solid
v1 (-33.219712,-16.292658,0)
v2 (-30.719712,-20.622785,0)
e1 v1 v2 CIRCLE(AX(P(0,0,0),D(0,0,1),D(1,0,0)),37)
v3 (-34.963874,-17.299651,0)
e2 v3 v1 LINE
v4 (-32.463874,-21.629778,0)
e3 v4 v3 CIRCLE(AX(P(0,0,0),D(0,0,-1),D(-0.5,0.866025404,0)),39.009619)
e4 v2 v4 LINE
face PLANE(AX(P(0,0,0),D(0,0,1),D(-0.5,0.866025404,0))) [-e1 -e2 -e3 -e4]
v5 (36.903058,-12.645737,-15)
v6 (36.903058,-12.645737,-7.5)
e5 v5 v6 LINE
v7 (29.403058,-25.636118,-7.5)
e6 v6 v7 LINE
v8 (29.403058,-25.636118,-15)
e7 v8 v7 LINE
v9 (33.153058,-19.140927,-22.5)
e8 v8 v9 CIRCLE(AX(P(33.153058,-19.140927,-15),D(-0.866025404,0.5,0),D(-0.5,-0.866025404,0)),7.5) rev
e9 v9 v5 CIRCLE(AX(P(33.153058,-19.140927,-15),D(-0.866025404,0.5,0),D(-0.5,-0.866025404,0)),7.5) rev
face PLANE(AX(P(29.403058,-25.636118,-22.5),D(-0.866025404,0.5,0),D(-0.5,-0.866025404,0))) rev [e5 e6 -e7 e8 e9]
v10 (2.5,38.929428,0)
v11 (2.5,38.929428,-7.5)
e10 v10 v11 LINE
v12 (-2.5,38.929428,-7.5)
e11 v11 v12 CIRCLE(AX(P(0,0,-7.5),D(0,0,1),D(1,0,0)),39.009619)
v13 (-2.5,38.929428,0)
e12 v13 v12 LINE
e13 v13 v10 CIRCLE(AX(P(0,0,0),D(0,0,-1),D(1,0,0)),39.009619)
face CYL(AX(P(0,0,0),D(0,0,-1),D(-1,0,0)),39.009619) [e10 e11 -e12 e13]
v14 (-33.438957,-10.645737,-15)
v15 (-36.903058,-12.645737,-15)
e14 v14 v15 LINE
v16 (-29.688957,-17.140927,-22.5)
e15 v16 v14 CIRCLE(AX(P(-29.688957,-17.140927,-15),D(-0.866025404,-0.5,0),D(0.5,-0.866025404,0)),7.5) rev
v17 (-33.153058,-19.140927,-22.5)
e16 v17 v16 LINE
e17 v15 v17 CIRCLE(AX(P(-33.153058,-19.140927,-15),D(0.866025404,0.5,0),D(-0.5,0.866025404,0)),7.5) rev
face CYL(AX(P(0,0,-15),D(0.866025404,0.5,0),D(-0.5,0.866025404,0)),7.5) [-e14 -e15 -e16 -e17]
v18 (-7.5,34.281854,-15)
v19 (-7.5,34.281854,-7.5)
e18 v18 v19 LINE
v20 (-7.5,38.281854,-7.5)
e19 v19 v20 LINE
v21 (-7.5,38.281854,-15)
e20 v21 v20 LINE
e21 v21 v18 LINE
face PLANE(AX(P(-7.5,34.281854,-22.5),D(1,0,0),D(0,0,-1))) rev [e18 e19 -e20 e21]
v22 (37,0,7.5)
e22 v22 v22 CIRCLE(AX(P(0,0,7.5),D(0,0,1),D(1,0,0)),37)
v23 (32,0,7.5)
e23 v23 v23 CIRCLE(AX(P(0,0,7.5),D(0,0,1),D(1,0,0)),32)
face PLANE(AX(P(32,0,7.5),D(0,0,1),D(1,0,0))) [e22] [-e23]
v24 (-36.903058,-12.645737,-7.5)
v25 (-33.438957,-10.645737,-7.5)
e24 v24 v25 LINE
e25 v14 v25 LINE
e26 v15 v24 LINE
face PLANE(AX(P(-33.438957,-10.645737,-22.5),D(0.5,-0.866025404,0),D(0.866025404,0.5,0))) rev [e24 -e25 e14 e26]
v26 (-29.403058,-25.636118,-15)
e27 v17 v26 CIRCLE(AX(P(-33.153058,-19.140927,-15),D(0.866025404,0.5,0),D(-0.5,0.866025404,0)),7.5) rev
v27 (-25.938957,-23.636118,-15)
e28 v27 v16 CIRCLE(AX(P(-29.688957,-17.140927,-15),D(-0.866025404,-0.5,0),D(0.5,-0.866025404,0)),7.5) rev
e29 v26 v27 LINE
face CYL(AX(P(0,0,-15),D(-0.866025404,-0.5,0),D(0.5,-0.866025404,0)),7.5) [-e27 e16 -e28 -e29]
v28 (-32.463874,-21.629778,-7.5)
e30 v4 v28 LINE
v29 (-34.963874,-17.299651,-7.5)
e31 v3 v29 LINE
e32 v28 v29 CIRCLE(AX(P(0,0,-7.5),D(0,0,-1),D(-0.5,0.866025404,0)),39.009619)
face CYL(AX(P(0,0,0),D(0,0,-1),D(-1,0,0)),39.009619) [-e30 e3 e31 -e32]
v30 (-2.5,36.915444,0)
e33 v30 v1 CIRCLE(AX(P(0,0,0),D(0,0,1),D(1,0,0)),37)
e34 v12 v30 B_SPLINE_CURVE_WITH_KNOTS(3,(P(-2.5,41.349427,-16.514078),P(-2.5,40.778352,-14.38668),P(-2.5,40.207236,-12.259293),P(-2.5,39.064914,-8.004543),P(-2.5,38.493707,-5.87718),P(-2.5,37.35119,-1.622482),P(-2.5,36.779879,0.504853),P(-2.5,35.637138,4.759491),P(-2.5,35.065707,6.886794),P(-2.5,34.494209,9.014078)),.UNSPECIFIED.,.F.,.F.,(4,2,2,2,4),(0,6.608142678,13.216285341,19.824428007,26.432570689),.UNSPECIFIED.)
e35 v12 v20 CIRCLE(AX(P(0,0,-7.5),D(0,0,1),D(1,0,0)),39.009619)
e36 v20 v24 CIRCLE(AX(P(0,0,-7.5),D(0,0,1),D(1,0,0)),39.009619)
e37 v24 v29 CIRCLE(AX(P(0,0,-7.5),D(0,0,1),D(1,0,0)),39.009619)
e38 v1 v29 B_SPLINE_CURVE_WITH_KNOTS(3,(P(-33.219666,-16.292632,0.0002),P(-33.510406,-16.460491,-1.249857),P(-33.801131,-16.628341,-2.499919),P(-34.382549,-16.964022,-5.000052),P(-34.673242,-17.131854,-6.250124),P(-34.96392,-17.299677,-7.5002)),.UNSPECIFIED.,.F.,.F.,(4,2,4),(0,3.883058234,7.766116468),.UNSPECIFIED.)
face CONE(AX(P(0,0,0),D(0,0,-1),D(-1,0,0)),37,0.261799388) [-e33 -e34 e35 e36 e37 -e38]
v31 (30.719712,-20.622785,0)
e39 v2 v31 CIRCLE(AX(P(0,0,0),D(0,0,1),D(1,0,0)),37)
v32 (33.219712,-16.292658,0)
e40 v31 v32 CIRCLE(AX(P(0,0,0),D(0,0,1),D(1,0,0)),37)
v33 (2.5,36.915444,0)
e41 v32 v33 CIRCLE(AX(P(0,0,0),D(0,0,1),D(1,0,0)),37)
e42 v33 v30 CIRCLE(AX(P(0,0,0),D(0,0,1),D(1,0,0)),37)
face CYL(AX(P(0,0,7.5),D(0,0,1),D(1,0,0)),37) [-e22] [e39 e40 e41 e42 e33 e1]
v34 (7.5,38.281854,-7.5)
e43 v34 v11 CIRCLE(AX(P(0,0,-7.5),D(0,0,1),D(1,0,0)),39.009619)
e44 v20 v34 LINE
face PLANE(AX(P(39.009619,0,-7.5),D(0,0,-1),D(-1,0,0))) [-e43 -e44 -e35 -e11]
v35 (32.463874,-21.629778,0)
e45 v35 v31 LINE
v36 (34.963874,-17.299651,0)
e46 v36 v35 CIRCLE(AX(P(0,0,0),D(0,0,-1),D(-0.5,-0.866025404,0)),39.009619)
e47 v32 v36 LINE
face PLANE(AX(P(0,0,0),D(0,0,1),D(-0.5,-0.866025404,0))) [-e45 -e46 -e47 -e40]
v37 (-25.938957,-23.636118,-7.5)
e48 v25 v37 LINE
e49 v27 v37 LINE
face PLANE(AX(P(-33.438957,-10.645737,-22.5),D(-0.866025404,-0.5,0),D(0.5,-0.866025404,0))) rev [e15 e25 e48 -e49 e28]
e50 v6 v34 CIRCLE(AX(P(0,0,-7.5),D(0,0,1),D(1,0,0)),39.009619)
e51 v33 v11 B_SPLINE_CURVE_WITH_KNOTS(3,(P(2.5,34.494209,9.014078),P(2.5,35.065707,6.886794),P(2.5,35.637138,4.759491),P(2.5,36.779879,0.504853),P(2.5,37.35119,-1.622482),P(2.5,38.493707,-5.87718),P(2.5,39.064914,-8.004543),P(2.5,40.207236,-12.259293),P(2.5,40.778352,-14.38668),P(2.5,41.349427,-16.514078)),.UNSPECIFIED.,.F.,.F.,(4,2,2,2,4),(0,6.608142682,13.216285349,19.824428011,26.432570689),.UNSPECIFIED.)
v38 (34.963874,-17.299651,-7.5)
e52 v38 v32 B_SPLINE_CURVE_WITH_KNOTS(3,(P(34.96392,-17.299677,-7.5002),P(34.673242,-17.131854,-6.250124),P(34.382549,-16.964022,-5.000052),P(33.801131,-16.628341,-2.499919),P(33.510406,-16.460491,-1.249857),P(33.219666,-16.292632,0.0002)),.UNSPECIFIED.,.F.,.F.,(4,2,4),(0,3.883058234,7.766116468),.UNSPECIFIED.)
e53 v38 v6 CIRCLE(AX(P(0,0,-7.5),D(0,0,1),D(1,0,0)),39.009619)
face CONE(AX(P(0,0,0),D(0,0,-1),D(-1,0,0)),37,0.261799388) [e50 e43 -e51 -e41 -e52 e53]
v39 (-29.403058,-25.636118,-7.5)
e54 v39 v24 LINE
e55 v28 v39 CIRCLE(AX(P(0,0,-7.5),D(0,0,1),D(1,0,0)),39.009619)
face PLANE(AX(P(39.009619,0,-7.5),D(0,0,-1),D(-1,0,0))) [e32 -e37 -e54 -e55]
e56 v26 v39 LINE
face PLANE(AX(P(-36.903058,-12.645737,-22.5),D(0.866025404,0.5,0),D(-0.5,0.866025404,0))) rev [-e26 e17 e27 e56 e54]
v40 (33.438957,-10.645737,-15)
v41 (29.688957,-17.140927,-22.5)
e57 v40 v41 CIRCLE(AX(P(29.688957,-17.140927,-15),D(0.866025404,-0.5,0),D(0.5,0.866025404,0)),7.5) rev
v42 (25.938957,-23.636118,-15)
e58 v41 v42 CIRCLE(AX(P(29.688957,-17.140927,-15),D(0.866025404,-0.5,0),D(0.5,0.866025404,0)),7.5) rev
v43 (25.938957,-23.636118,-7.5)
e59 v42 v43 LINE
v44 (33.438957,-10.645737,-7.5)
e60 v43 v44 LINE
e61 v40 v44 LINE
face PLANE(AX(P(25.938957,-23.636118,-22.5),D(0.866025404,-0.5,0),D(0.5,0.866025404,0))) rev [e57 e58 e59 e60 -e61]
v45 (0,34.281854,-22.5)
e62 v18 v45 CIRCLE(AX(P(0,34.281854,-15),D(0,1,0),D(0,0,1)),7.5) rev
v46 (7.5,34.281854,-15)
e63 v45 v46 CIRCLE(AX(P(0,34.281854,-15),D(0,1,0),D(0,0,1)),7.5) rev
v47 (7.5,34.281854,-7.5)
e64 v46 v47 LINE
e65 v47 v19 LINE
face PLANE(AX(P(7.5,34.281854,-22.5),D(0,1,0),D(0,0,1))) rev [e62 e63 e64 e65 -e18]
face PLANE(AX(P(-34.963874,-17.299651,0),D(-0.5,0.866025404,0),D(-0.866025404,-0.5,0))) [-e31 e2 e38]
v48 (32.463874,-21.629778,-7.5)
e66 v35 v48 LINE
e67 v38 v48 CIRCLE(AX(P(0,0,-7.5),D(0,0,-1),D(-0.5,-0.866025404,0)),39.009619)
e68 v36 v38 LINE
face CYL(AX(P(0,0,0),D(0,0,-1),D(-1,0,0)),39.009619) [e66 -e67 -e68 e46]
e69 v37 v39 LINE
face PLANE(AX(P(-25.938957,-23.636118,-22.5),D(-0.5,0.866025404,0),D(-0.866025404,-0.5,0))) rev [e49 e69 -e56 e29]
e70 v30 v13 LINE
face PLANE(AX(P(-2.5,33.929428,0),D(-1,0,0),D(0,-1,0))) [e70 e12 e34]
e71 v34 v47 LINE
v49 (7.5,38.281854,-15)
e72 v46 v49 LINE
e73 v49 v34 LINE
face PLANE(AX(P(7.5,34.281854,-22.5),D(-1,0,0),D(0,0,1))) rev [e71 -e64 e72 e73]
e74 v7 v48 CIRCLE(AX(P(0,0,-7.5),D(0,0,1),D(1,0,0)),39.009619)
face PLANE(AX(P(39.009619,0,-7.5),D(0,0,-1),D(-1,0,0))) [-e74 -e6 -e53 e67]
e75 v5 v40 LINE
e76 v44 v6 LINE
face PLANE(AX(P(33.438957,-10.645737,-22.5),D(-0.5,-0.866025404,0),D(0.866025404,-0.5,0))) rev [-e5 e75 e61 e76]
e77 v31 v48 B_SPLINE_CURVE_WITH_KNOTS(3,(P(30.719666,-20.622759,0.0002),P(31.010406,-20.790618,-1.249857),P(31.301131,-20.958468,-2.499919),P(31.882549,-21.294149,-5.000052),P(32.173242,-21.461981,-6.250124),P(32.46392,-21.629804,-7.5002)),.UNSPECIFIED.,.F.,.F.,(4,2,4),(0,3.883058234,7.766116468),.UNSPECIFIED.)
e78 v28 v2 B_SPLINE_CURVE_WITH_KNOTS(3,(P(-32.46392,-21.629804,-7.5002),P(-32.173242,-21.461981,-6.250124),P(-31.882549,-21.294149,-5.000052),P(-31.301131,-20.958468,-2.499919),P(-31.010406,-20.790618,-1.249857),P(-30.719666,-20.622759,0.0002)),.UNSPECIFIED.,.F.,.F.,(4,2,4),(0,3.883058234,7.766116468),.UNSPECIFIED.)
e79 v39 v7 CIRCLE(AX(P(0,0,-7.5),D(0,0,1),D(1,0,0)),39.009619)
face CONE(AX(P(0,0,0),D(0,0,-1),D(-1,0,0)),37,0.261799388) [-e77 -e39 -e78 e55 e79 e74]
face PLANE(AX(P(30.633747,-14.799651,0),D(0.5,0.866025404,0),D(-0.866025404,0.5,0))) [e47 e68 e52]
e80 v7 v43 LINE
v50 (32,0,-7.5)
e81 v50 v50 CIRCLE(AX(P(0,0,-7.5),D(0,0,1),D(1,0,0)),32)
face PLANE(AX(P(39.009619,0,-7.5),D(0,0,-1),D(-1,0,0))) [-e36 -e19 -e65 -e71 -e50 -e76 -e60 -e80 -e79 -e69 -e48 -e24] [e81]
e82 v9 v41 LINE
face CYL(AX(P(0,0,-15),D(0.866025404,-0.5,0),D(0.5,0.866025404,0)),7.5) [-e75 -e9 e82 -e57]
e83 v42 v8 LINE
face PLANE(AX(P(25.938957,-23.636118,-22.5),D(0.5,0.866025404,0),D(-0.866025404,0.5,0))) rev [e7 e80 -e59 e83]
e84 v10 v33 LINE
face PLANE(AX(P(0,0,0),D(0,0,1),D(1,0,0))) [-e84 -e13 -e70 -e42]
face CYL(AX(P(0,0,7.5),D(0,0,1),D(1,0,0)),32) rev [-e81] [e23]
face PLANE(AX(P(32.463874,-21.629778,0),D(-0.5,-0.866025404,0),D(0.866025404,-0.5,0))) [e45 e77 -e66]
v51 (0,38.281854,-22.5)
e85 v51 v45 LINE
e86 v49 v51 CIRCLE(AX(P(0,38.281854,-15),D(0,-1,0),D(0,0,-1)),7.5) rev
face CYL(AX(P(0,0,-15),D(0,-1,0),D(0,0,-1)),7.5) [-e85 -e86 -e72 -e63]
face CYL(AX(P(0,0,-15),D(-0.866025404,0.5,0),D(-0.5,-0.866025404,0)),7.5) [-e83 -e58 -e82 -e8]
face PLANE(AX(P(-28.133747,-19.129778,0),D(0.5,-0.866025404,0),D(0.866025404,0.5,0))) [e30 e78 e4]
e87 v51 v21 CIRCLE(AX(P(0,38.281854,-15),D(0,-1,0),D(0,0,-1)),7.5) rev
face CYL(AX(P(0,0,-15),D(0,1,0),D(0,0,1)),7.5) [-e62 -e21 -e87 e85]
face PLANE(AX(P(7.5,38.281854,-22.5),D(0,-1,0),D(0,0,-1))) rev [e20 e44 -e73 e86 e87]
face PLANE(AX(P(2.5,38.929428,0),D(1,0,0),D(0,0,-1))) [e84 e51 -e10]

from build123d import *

# Parameters (mm, degrees)
BOSS_EXTRUDE1_DEPTH      = 7.5
SKETCH6_W                = 15
SKETCH6_H                = 4
BOSS_EXTRUDE2_DEPTH      = 15
FILLET1_R                = 7.5
CIRPATTERN1_COUNT        = 3
FILLET1_OF_CIRPATTERN1_R = 7.5


with BuildPart() as part:
    # Sketch2 → Revolve1 (revolve)
    with BuildSketch(Plane(origin=(0, 0, 0), x_dir=(1, 0, 0), z_dir=(0, 1, 0))):
        Polygon((37, 0), (37, -7.5), (32, -7.5), (32, 7.5), (39.009618943, 7.5), align=None)
    revolve(axis=Axis((0, 0, 7.5), (0, 0, -1)))

    # Sketch3 → Boss-Extrude1 (add)
    with BuildSketch(Plane(origin=(0, 0, -7.5), x_dir=(-1, 0, 0), z_dir=(0, 0, -1))):
        with BuildLine():
            Line((-2.5, 38.929428073), (-2.5, 33.929428073))
            Line((-2.5, 33.929428073), (2.5, 33.929428073))
            Line((2.5, 33.929428073), (2.5, 38.929428073))
            ThreePointArc((2.5, 38.929428073), (0, 39.009618943), (-2.5, 38.929428073))
        make_face()
    boss_extrude1 = extrude(amount=-BOSS_EXTRUDE1_DEPTH)

    # Sketch6 → Boss-Extrude2 (add)
    with BuildSketch(Plane(origin=(0, 0, -7.5), x_dir=(-1, 0, 0), z_dir=(0, 0, -1))):
        with Locations((0, 36.281854319)):
            Rectangle(SKETCH6_W, SKETCH6_H)
    boss_extrude2 = extrude(amount=BOSS_EXTRUDE2_DEPTH)

    # Fillet1
    fillet1_edges = [part.edges().sort_by_distance(p)[0] for p in [
        (-7.5, 36.281854319, -22.5),
        (7.5, 36.281854319, -22.5),
    ]]
    fillet(fillet1_edges, radius=FILLET1_R - 0.0001)  # a hair under: the kernel refuses the full size

    # CirPattern1: Boss-Extrude1, Boss-Extrude2 ×3 about axis
    cirpattern1_axis = Axis((0, 0, 0), (0, 0, 1))
    add([boss_extrude1.rotate(cirpattern1_axis, i * 360 / CIRPATTERN1_COUNT) for i in range(1, CIRPATTERN1_COUNT)])
    add([boss_extrude2.rotate(cirpattern1_axis, i * 360 / CIRPATTERN1_COUNT) for i in range(1, CIRPATTERN1_COUNT)])

    # Fillet1 of CirPattern1
    fillet1_of_cirpattern1_edges = [part.edges().sort_by_distance(p)[0] for p in [
        (-27.671007537, -24.636117688, -22.5),
        (-35.171007537, -11.645736631, -22.5),
        (35.171007537, -11.645736631, -22.5),
        (27.671007537, -24.636117688, -22.5),
    ]]
    fillet(fillet1_of_cirpattern1_edges, radius=FILLET1_OF_CIRPATTERN1_R - 0.0001)  # a hair under: the kernel refuses the full size


solid = part.part
